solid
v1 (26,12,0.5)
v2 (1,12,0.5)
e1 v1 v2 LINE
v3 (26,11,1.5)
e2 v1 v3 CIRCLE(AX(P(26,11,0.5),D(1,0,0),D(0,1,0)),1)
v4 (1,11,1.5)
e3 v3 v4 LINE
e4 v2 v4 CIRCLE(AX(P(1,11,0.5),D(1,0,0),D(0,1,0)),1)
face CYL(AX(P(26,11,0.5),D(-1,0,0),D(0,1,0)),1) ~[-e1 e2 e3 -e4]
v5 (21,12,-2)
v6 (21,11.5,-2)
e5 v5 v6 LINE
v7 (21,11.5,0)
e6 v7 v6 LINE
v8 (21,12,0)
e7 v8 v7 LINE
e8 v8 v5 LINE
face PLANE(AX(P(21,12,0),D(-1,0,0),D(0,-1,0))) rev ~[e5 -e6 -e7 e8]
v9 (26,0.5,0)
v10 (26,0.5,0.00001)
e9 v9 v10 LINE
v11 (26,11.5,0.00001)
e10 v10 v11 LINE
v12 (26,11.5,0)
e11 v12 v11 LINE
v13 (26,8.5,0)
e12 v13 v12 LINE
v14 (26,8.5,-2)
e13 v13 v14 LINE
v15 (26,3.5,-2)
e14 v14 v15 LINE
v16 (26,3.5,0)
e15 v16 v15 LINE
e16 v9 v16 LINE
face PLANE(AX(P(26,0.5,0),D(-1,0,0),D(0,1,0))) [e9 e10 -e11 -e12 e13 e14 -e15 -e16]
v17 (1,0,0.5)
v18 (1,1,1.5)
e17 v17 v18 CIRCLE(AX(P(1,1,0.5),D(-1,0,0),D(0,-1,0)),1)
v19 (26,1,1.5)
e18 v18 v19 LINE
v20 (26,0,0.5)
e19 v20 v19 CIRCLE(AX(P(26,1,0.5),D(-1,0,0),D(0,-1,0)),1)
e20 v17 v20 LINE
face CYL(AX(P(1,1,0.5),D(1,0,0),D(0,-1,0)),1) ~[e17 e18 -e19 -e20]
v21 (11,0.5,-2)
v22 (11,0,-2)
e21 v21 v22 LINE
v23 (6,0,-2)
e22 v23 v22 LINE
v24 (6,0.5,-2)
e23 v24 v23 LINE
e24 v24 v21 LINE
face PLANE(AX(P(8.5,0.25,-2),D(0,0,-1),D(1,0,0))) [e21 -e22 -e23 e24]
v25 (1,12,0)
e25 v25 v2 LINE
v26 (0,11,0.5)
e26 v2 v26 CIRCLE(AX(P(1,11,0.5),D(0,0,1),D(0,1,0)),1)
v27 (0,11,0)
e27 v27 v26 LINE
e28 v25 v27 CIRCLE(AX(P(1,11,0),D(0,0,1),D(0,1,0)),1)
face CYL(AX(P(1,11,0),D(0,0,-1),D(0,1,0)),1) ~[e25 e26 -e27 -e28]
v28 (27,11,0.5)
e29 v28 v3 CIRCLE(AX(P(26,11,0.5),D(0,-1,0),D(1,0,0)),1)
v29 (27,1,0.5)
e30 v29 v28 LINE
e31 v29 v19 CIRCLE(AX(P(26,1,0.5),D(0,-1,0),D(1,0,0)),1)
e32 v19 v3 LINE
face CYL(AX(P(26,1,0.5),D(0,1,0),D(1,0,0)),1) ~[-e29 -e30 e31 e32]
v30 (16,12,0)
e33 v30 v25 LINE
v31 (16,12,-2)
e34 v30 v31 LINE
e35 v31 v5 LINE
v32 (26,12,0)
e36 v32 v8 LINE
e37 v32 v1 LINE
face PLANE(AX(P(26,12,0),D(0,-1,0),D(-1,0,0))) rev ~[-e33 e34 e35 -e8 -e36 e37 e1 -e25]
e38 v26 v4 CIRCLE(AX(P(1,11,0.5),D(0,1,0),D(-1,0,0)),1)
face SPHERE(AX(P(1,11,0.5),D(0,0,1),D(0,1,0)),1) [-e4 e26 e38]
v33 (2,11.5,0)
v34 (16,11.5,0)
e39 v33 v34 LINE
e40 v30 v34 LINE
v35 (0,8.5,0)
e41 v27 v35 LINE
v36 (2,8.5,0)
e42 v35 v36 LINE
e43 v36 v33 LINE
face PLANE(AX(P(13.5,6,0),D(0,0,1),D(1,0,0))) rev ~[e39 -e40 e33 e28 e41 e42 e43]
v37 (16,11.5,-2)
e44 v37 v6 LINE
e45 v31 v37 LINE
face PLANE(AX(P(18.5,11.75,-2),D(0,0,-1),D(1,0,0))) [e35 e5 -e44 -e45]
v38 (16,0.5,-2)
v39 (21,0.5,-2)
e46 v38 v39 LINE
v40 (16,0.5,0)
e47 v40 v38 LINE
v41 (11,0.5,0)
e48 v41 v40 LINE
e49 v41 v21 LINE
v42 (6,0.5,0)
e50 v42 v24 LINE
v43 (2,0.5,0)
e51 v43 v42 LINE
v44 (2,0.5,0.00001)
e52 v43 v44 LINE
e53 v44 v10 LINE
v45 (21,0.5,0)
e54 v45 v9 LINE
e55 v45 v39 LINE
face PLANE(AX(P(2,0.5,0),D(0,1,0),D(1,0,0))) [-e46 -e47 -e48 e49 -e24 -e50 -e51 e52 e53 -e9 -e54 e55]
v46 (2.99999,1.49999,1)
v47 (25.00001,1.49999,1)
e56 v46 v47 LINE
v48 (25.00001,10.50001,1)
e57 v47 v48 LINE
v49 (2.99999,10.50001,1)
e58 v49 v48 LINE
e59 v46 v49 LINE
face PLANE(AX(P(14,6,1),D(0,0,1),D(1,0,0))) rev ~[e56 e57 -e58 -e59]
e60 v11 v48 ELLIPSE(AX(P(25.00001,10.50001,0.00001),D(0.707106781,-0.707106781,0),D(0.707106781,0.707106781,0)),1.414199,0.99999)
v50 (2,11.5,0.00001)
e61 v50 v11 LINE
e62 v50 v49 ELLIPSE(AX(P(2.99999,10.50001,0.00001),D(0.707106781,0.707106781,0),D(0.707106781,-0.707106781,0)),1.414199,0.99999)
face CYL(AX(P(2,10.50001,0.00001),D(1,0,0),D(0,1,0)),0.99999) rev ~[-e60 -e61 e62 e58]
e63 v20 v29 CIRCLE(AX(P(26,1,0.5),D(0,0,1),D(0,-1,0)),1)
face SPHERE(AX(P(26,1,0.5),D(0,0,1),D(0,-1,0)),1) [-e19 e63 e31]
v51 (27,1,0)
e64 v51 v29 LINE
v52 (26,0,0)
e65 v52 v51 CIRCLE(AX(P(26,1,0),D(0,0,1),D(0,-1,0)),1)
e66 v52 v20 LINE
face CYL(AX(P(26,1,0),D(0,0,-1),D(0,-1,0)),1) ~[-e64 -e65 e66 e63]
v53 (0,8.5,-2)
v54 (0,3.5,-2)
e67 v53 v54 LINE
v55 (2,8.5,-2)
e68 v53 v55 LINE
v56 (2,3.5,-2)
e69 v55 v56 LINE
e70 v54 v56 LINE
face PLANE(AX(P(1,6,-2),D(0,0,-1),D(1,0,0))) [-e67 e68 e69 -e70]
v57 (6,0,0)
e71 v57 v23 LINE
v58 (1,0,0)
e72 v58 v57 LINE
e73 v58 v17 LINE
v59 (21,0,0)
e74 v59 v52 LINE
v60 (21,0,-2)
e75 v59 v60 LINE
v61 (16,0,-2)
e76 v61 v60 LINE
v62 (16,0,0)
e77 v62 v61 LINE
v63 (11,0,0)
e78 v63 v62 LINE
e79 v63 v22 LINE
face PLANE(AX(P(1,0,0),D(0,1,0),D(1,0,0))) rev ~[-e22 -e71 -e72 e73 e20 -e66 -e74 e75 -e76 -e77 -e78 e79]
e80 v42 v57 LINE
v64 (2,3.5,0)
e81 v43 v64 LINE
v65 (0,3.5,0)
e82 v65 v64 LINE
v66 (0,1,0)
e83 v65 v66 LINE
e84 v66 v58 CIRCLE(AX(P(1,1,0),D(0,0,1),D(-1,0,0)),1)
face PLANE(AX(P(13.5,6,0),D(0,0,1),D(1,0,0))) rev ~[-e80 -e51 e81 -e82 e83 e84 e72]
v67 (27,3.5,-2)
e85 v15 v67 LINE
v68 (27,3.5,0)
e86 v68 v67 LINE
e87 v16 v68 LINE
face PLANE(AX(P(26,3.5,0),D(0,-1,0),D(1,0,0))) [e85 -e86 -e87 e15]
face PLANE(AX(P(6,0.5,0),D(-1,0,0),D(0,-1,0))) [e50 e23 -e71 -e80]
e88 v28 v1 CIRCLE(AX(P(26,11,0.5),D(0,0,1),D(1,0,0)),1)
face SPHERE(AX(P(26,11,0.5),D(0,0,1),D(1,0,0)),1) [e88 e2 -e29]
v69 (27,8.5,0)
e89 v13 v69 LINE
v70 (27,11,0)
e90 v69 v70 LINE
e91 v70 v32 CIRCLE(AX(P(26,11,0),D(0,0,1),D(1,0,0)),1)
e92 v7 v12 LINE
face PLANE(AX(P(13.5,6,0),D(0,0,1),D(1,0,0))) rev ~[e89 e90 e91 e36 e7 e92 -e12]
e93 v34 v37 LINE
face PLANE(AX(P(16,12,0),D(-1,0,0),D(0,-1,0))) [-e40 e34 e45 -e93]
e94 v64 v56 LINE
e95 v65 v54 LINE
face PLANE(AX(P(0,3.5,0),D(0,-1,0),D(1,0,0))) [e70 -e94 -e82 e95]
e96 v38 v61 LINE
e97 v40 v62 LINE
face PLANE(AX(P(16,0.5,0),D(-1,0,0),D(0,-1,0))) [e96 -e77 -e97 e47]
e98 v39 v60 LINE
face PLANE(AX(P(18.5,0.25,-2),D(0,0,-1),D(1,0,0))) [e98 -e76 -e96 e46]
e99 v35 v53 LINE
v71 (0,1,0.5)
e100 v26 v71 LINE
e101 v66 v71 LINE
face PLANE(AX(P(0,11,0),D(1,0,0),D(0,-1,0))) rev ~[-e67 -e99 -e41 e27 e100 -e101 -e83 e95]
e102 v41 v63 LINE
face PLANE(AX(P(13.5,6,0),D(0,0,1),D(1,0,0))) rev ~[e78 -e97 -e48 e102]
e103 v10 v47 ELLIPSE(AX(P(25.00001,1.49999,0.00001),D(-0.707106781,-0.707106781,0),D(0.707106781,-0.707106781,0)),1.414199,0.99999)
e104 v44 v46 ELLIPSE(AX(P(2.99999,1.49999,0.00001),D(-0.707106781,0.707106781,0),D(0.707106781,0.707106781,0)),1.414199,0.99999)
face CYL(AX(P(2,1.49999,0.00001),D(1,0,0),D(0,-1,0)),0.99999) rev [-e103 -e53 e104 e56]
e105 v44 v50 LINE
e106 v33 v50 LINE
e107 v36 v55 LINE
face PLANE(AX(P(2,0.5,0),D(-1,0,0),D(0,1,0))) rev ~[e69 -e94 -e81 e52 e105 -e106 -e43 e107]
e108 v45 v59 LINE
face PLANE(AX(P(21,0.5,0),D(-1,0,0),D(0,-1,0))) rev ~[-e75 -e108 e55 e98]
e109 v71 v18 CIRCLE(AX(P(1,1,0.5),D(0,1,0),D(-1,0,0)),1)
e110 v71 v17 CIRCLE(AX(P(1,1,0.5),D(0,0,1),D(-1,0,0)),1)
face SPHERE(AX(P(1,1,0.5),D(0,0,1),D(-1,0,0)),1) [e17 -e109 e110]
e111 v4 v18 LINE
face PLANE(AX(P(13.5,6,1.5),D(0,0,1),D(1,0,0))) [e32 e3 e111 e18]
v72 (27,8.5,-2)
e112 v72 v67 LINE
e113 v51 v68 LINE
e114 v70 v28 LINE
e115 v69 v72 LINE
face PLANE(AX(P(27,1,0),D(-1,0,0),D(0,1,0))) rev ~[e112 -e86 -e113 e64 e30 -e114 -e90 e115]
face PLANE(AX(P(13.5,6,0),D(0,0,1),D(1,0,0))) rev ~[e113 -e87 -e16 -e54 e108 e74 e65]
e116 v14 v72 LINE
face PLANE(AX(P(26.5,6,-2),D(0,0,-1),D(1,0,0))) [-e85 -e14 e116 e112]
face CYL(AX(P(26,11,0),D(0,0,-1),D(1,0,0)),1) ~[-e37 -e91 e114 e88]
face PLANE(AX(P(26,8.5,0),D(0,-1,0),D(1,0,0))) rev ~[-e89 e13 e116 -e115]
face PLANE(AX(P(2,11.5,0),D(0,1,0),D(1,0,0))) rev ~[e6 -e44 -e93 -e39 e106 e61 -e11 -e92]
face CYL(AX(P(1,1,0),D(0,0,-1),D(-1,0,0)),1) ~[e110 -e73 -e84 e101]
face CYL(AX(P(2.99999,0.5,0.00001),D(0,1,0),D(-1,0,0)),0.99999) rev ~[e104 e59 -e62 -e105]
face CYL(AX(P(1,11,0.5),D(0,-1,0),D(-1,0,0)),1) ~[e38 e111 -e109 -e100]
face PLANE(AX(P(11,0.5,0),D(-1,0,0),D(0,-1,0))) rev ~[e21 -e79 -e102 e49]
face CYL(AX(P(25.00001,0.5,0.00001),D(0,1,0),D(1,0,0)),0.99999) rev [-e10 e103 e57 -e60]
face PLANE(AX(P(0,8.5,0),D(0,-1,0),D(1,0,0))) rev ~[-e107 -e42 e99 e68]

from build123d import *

# Parameters (mm, degrees)
F1_DEPTH = 1.5
F2_R     = 1
F3_W     = 24
F3_H     = 11
F4_DEPTH = 1
F5_R     = 0.99999
F6_W     = 2
F6_H     = 5
F6_W_2   = 1
F6_W_3   = 5
F6_H_2   = 0.5
F7_DEPTH = 2


# Not quite as in the source:
# - a fillet or chamfer is up to 0.001 mm smaller than in the source, because OpenCascade refuses the exact size


with BuildPart() as f1:
    # F0 (on Top) → F1 (new body)
    with BuildSketch(Plane.XY):
        with BuildLine():
            ThreePointArc((0, 1), (0.2928932188, 0.2928932188), (1, 0))
            Line((1, 0), (26, 0))
            ThreePointArc((26, 0), (26.7071067812, 0.2928932188), (27, 1))
            Line((27, 1), (27, 11))
            ThreePointArc((27, 11), (26.7071067812, 11.7071067812), (26, 12))
            Line((26, 12), (1, 12))
            ThreePointArc((1, 12), (0.2928932188, 11.7071067812), (0, 11))
            Line((0, 11), (0, 1))
        make_face()
    extrude(amount=F1_DEPTH)

    # F2
    f2_edges = [f1.edges().sort_by_distance(p)[0] for p in [
        (0, 6, 1.5),
        (0.292893, 0.292893, 1.5),
        (13.5, 0, 1.5),
        (26.707107, 0.292893, 1.5),
        (27, 6, 1.5),
        (26.707107, 11.707107, 1.5),
        (13.5, 12, 1.5),
        (0.292893, 11.707107, 1.5),
    ]]
    fillet(f2_edges, radius=F2_R)

    # F3 (on Top) → F4 (cut)
    with BuildSketch(Plane.XY):
        with Locations((14, 6)):
            Rectangle(F3_W, F3_H)
    extrude(amount=F4_DEPTH, mode=Mode.SUBTRACT)

    # F5 (radius 1 in the source; OpenCascade refuses exactly that, so slightly less here)
    f5_edges = [f1.edges().sort_by_distance(p)[0] for p in [
        (14, 11.5, 1),
        (2, 6, 1),
        (14, 0.5, 1),
        (26, 6, 1),
    ]]
    fillet(f5_edges, radius=F5_R)

    # F6 (on face) → F7 (join)
    with BuildSketch(Plane(origin=(0, 0, 0), x_dir=(1, 0, 0), z_dir=(0, 0, -1))):
        with Locations((1, -6)):
            Rectangle(F6_W, F6_H)
        with Locations((26.5, -6)):
            Rectangle(F6_W_2, F6_H)
        with Locations((8.5, -0.25)):
            Rectangle(F6_W_3, F6_H_2)
        with Locations((18.5, -0.25)):
            Rectangle(F6_W_3, F6_H_2)
        with Locations((18.5, -11.75)):
            Rectangle(F6_W_3, F6_H_2)
    extrude(amount=F7_DEPTH)


solid = f1.part
